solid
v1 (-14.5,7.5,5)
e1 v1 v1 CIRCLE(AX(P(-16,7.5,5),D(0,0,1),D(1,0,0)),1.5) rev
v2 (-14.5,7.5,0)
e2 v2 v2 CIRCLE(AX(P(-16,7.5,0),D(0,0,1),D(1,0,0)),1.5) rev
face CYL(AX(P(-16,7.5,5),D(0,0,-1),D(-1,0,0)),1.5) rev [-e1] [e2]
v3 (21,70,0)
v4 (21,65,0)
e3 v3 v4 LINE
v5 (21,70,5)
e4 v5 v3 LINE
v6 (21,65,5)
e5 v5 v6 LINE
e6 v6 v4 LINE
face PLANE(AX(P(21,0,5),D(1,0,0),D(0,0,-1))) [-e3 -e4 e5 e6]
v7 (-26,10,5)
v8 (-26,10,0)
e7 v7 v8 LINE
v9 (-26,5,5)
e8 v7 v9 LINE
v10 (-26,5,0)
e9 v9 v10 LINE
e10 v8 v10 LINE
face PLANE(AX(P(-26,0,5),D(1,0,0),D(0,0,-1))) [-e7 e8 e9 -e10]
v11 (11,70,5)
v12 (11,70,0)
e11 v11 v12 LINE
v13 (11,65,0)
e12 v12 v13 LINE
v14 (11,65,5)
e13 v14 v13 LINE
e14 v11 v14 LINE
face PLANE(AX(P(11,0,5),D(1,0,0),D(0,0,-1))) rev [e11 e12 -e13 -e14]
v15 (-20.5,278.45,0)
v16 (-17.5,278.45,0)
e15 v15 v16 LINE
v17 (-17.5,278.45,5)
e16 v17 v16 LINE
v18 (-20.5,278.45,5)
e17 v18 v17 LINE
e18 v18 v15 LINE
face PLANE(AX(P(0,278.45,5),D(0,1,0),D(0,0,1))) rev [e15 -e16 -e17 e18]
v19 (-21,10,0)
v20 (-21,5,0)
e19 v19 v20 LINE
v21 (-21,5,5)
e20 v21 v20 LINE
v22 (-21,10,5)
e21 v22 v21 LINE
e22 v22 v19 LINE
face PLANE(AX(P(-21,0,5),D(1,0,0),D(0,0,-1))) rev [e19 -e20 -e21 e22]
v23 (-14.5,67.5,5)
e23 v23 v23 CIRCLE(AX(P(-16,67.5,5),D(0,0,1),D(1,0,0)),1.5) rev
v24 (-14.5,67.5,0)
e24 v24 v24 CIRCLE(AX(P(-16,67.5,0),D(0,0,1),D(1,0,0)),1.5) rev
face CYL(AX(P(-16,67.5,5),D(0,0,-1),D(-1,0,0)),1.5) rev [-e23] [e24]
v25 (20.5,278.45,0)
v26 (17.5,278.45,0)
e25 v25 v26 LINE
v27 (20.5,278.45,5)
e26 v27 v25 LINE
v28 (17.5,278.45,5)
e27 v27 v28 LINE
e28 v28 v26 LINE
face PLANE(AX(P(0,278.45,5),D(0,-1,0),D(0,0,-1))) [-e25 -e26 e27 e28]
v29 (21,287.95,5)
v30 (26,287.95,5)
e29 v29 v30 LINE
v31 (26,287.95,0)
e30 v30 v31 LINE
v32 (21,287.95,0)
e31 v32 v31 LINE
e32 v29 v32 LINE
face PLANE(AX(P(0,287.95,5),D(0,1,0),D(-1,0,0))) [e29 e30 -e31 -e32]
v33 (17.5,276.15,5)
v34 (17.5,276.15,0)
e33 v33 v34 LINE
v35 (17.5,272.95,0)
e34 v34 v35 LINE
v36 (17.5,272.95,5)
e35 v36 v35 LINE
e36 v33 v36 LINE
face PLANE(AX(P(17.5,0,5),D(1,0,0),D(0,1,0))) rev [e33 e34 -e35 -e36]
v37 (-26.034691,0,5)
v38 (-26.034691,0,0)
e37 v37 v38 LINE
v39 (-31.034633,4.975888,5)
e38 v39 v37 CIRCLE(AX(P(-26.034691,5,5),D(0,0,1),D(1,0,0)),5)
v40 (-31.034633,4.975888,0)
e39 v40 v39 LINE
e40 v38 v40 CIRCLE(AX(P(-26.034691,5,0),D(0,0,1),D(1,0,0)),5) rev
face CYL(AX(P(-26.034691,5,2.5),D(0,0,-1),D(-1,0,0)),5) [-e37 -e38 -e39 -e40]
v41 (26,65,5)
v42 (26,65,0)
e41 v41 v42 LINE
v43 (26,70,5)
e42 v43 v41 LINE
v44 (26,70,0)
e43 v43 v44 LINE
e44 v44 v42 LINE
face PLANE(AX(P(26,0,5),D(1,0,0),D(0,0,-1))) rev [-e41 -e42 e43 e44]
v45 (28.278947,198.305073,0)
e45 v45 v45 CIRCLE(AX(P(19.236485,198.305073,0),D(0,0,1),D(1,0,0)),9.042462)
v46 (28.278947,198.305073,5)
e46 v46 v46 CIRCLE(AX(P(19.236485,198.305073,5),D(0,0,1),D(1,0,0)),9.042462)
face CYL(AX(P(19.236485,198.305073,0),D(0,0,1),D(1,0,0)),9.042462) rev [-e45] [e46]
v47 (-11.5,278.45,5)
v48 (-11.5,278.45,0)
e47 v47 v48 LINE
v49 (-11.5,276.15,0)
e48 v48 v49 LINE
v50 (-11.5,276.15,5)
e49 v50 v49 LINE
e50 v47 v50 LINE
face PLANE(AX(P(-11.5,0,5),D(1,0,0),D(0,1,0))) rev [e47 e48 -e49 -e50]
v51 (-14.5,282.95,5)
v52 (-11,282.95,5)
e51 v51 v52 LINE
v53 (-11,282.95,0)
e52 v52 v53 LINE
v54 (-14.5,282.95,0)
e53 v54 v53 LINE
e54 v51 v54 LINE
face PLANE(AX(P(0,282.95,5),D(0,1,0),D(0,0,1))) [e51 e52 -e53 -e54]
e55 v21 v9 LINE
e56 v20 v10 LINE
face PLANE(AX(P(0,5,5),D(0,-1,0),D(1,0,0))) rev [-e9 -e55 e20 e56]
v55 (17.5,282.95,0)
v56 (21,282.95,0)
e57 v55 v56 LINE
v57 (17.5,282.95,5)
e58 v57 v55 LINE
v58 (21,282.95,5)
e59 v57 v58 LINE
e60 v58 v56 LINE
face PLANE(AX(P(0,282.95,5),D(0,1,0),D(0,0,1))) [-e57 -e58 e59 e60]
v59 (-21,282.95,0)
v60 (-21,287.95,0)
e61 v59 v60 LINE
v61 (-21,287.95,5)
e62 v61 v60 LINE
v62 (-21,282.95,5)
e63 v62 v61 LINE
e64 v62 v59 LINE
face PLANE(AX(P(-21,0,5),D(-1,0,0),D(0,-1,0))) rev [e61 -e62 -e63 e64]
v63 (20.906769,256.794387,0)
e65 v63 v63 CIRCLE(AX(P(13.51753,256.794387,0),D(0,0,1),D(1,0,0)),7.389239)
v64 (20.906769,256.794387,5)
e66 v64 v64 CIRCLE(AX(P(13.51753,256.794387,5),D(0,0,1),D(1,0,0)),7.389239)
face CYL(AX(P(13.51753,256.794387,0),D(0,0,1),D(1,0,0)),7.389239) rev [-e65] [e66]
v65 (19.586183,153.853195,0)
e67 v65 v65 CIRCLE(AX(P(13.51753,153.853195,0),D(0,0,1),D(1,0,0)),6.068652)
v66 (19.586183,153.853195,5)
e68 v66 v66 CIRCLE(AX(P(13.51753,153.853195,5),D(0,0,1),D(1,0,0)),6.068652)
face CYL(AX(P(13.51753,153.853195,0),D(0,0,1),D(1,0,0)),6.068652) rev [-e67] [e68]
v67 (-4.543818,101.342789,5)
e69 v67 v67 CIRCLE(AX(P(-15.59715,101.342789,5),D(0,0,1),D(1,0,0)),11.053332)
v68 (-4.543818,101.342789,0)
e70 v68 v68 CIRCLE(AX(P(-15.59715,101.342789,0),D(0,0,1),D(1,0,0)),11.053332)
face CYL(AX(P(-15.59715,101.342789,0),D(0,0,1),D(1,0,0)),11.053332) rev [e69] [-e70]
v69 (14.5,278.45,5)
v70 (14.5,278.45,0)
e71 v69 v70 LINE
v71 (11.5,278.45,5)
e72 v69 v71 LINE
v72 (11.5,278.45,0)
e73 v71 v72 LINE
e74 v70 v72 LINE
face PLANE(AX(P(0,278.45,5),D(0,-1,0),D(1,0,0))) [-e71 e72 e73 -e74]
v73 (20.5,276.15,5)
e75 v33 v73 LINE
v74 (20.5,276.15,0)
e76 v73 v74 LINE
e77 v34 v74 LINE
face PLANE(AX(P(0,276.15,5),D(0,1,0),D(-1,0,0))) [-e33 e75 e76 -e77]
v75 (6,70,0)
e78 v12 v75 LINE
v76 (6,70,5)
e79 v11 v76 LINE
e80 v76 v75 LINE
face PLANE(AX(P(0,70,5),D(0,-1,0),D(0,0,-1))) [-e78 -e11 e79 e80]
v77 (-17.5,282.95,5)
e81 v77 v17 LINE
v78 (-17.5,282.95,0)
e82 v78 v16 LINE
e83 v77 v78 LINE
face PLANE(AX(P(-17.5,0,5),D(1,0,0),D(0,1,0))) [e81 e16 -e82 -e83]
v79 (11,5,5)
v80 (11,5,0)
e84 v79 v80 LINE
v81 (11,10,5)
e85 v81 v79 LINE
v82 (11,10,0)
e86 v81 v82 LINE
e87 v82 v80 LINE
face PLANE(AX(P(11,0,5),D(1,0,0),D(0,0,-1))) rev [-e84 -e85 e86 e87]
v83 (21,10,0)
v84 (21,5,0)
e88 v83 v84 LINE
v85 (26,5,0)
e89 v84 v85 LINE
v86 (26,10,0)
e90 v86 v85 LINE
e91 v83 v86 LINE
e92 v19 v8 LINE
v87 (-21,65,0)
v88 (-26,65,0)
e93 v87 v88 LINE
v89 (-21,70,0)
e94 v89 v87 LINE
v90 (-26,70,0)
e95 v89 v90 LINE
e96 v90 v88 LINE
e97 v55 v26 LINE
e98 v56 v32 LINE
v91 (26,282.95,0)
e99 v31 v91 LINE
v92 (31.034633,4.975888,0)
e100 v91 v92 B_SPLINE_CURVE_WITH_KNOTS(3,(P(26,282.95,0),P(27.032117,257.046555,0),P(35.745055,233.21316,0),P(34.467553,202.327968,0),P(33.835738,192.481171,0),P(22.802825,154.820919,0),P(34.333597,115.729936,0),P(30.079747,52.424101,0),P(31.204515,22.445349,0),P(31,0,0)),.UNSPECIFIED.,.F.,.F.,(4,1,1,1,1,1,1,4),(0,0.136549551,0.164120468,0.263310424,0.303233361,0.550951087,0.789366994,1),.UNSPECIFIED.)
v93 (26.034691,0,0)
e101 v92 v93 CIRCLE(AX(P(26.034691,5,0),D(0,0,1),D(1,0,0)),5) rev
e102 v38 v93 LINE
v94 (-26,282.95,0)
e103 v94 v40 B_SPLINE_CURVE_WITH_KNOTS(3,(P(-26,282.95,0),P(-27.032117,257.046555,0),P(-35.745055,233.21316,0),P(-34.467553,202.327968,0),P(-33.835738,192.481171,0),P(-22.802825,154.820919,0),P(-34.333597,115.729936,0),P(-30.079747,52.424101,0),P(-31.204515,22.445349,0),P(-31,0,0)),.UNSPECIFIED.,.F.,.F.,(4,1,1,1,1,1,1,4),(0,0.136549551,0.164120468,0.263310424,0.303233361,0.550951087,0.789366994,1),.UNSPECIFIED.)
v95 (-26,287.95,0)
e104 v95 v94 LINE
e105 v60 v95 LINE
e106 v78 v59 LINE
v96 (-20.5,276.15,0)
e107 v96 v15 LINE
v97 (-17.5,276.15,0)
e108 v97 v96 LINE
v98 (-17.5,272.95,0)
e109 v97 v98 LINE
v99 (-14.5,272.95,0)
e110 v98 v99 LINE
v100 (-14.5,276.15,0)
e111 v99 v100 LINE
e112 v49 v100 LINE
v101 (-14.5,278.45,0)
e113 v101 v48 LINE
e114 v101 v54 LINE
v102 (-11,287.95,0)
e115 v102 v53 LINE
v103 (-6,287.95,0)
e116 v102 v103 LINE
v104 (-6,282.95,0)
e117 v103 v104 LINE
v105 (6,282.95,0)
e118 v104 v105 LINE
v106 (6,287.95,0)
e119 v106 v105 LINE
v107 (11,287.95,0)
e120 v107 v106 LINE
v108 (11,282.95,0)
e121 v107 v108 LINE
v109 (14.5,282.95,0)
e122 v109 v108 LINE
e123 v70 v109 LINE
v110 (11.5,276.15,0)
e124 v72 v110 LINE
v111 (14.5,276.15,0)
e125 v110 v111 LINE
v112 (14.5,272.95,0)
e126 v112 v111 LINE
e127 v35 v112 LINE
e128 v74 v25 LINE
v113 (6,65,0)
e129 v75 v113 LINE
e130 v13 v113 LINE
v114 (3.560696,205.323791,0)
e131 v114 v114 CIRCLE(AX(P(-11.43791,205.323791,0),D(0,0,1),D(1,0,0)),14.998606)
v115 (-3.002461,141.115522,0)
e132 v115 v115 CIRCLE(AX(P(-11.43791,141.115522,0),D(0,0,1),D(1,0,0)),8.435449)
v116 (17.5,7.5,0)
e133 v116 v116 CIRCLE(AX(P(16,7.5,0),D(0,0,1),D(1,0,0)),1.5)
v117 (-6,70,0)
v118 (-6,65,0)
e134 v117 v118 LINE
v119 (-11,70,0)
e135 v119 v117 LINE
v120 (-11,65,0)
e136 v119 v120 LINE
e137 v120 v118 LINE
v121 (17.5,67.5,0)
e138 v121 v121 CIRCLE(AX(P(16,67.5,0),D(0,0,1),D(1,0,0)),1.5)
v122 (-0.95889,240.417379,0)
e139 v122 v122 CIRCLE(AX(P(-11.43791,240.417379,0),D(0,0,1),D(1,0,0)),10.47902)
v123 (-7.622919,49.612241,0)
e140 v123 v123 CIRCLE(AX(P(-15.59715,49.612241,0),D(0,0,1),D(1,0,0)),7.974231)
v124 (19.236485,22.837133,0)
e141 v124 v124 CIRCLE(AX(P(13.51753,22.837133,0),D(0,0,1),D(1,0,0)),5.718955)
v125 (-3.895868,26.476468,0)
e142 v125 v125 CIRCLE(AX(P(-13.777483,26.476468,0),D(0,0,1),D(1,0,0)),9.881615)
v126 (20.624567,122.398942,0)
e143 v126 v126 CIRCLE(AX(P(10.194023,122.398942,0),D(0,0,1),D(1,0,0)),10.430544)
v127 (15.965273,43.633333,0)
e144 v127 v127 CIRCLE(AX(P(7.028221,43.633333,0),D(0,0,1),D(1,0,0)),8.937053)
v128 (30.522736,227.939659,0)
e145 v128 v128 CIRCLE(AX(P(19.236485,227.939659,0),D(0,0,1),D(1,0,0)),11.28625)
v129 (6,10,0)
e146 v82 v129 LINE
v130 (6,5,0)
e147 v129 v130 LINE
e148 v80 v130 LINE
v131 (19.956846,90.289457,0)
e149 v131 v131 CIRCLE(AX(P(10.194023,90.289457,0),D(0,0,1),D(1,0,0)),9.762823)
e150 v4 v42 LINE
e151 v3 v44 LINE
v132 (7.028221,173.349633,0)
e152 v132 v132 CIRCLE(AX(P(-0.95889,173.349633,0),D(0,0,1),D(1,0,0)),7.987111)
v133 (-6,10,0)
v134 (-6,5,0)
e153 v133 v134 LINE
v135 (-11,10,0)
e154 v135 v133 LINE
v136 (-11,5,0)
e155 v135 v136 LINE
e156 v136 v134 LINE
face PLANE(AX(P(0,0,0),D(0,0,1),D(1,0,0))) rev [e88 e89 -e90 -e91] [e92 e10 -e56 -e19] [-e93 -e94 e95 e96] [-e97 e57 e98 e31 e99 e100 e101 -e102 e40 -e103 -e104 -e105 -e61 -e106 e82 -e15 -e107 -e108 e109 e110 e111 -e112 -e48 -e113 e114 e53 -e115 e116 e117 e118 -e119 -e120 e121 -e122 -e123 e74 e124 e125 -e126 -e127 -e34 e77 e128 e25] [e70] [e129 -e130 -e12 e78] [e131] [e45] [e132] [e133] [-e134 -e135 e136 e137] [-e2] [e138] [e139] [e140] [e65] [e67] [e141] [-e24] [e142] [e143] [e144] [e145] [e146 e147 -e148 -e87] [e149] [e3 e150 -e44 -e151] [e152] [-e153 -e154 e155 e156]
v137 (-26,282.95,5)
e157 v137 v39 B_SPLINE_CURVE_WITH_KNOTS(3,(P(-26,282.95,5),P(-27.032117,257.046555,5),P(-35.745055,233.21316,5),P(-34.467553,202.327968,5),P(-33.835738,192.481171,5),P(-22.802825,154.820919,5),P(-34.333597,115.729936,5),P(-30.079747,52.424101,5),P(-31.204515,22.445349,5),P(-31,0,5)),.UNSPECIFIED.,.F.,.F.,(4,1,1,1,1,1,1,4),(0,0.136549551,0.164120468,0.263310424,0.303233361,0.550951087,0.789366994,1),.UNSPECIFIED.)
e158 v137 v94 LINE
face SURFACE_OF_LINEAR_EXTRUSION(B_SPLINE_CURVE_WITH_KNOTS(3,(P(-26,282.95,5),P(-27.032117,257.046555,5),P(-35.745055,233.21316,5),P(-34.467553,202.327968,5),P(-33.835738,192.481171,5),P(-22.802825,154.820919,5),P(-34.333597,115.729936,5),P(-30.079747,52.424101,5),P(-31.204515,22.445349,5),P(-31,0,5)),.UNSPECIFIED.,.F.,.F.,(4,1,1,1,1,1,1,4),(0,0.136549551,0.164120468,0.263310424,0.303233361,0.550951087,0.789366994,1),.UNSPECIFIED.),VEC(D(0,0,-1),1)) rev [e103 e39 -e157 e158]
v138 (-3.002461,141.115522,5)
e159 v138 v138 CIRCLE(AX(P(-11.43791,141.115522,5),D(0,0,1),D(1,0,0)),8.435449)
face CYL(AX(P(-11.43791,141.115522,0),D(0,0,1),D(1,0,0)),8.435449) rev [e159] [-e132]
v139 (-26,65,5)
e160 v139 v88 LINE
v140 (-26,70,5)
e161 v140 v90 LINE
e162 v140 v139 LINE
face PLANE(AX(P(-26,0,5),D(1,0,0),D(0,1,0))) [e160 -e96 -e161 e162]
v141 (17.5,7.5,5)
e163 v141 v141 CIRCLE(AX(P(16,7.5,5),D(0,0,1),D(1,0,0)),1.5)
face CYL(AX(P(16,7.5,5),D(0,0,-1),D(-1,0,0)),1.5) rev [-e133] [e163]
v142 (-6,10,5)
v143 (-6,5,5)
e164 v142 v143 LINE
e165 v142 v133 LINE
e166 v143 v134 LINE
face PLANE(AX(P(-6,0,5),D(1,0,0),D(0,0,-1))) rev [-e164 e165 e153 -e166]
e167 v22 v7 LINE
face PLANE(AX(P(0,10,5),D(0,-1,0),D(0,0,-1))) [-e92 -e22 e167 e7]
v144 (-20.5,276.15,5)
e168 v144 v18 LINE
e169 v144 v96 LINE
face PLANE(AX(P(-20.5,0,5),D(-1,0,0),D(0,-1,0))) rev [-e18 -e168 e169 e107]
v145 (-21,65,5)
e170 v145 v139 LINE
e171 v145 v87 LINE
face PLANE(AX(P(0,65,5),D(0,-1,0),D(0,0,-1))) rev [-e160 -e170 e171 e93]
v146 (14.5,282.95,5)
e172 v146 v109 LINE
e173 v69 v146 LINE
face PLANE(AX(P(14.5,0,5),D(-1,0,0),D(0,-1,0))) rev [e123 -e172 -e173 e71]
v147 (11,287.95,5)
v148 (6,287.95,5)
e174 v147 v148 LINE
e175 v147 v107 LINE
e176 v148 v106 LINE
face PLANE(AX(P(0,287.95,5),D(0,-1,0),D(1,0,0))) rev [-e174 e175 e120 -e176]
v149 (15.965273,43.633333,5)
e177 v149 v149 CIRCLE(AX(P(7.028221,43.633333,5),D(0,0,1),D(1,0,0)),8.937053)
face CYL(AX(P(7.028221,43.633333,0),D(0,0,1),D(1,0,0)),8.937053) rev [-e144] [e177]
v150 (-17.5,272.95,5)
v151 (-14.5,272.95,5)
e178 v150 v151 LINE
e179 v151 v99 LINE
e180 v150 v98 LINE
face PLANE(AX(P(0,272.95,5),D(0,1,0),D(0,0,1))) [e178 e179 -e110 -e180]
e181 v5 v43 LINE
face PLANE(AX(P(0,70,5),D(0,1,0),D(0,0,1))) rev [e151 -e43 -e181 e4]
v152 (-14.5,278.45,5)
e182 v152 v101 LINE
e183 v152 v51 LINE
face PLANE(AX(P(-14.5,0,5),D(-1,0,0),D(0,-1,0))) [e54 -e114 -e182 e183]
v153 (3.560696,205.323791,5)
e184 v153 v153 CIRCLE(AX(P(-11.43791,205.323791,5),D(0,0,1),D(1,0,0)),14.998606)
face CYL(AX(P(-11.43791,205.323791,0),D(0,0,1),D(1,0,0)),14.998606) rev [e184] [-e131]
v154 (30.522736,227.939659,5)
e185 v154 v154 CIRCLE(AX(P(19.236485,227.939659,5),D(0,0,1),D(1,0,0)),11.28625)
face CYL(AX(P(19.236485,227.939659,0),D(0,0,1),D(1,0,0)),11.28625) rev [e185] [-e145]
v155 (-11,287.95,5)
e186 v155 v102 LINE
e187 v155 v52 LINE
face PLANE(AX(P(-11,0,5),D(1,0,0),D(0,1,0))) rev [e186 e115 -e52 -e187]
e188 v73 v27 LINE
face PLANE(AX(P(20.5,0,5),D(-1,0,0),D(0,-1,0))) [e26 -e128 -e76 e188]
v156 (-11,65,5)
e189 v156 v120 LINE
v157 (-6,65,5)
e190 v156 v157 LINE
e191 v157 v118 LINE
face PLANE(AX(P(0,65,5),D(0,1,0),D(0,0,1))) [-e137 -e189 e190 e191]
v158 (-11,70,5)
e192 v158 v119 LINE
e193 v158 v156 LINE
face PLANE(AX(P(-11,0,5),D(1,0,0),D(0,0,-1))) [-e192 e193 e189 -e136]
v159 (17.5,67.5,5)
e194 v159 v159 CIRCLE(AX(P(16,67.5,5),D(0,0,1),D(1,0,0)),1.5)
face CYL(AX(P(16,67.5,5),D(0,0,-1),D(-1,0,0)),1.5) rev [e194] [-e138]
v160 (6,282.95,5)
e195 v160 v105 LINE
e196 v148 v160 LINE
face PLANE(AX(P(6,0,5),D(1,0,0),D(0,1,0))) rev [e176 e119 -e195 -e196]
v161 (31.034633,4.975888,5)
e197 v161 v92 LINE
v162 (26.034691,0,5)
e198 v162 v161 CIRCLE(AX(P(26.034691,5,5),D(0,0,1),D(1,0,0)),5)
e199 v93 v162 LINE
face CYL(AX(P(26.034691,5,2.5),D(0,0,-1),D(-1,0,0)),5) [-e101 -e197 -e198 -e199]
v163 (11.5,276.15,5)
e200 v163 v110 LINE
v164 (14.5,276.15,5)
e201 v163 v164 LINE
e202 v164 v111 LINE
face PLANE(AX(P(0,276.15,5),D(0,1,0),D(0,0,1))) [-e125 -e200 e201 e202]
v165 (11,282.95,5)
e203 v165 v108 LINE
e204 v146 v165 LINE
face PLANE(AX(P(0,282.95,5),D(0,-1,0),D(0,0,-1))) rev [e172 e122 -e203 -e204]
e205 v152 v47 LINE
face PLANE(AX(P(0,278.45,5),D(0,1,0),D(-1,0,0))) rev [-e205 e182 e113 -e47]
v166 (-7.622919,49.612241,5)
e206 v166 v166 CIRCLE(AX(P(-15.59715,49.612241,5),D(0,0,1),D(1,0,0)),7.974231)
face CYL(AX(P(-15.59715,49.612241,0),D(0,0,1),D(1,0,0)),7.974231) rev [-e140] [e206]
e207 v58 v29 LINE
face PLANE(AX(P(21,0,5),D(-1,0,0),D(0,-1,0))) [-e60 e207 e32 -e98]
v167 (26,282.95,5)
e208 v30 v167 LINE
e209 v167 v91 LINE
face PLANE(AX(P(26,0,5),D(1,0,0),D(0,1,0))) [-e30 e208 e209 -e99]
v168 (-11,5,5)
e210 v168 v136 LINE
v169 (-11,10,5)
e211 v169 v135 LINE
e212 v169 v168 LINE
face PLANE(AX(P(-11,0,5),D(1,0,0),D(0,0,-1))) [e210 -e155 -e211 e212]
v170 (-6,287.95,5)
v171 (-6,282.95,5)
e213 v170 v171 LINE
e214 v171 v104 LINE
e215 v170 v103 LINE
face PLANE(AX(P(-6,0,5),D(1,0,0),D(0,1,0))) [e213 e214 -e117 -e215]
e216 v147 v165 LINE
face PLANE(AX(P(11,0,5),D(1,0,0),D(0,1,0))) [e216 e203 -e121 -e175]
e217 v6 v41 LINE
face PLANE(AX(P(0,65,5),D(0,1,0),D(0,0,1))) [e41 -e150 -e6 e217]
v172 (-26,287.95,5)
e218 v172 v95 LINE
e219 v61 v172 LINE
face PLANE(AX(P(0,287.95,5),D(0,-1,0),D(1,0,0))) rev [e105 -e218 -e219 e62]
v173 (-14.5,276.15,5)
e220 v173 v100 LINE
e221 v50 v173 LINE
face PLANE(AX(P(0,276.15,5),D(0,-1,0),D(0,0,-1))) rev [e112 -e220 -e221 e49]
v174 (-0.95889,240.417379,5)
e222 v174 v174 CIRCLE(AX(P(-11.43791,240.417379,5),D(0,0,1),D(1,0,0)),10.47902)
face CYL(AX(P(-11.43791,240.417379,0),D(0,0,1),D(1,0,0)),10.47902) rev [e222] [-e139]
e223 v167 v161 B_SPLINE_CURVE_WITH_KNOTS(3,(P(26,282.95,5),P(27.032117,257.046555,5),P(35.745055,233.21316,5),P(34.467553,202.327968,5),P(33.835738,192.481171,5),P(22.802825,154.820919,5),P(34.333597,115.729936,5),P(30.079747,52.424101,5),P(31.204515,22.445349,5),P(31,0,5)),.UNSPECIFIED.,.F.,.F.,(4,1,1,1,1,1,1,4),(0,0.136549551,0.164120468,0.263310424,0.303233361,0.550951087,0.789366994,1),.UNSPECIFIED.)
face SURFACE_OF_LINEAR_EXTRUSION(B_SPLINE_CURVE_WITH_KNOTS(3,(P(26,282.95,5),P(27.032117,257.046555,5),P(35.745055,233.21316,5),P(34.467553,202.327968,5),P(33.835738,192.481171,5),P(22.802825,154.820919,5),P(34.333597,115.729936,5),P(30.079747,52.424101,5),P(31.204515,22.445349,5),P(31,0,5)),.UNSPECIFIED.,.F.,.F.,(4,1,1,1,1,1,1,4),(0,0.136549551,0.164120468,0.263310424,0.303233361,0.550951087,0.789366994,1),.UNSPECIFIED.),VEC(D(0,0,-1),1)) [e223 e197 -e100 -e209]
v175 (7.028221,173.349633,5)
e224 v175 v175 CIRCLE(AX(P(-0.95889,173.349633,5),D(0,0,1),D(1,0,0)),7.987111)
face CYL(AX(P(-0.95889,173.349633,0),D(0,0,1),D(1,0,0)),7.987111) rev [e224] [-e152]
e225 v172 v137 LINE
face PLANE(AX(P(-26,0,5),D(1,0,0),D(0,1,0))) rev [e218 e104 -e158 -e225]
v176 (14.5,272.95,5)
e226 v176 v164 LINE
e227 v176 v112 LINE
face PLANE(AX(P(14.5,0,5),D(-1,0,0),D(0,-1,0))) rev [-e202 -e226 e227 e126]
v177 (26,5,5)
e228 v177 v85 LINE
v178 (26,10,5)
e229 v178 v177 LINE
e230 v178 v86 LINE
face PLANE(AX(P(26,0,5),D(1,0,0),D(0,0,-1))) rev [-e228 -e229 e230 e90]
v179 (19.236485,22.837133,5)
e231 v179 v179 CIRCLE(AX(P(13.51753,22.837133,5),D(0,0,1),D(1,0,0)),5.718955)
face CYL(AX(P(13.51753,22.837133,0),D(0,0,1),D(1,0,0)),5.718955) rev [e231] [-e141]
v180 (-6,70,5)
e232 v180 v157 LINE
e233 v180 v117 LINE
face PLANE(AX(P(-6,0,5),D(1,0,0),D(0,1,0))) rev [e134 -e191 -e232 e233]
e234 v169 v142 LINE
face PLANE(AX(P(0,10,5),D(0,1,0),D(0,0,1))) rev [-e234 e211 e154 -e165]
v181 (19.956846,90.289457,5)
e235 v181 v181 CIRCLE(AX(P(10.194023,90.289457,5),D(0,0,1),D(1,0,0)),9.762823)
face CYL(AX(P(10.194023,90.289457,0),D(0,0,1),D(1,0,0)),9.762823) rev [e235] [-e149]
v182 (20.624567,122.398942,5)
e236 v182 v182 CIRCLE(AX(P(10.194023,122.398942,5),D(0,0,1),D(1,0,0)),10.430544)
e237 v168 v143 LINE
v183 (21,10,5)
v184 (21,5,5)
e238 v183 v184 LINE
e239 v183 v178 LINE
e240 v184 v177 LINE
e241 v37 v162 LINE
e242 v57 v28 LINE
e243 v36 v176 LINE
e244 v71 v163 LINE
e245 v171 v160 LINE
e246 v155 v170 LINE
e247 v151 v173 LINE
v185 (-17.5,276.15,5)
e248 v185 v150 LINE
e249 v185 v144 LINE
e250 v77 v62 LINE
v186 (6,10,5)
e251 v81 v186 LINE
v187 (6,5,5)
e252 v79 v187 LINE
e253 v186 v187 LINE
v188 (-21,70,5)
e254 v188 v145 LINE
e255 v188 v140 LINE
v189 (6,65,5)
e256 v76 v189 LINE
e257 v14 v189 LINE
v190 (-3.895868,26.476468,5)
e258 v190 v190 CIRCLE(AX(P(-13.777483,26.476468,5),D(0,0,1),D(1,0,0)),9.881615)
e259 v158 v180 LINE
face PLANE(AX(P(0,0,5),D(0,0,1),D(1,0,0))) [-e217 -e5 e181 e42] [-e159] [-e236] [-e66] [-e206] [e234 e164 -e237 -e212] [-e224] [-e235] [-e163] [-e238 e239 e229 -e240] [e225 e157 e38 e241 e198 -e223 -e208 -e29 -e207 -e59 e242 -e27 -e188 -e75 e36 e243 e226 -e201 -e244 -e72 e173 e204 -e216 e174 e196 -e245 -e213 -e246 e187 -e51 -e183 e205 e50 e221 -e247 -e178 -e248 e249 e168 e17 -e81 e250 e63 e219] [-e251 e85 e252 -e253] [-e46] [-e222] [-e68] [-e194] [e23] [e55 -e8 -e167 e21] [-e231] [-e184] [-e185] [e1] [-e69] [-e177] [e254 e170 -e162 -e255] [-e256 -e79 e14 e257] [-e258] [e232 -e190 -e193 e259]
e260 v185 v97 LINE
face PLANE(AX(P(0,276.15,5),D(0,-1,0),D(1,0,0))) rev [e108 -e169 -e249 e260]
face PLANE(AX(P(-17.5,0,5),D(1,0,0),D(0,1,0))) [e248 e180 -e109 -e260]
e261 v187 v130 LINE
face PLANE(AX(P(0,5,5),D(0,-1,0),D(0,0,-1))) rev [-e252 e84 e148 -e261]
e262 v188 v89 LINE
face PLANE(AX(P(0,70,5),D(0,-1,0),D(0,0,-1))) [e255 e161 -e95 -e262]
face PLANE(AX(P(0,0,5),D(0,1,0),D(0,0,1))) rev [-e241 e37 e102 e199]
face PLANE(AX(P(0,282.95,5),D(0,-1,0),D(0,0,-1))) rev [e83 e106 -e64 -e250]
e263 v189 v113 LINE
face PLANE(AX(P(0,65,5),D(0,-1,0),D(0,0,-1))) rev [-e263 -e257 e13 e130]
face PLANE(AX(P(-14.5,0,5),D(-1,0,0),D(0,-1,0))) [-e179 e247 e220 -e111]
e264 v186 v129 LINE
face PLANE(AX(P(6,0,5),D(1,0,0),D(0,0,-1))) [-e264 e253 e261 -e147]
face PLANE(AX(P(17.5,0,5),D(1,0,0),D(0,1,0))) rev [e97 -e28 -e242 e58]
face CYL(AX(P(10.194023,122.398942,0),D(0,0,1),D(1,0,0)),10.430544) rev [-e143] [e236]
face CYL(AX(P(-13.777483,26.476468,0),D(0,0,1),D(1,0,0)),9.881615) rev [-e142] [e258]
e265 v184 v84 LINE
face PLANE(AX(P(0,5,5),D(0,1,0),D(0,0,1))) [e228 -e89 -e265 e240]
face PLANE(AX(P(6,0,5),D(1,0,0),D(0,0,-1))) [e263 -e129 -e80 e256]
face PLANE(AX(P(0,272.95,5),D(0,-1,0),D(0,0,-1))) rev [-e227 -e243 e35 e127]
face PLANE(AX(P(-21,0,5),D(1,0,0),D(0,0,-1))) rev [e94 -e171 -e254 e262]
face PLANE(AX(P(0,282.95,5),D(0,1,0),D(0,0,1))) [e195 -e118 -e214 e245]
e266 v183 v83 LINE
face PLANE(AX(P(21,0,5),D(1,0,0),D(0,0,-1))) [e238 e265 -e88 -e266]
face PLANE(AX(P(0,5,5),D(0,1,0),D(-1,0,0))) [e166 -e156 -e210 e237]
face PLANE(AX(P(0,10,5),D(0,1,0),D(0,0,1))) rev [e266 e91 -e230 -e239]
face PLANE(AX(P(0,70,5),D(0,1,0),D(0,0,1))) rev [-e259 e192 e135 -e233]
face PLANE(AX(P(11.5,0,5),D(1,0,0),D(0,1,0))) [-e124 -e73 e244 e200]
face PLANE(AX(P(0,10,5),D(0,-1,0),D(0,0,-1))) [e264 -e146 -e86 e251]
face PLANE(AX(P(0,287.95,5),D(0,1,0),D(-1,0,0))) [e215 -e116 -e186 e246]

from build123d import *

# Parameters (mm, degrees)
BOSS_EXTRU_1_OUTLINE_W  = 5
BOSS_EXTRU_1_OUTLINE_H  = 5
BOSS_EXTRU_1_OUTLINE_R  = 1.5
BOSS_EXTRU_1_DEPTH      = 5
CONG_1_R                = 5
ESQUISSE2_R             = 10.479020463
ESQUISSE2_R_2           = 11.286250442
ESQUISSE2_R_3           = 14.998606228
ESQUISSE2_R_4           = 9.04246197
ESQUISSE2_R_5           = 7.987110618
ESQUISSE2_R_6           = 8.435448753
ESQUISSE2_R_7           = 10.430543624
ESQUISSE2_R_8           = 11.053332103
ESQUISSE2_R_9           = 9.762822846
ESQUISSE2_R_10          = 7.974231095
ESQUISSE2_R_11          = 8.937052564
ESQUISSE2_R_12          = 9.881615002
ESQUISSE2_R_13          = 5.718955096
ESQUISSE2_R_14          = 6.068652319
ESQUISSE2_R_15          = 7.38923853
ENL_V_MAT_EXTRU_1_DEPTH = 291.112887432


# Read off the part's stored shape, not the designer's step: Boss.-Extru.1
with BuildPart() as part:
    # Boss.-Extru.1 outline → Boss.-Extru.1 (new body)
    with BuildSketch(Plane.XY):
        with BuildLine():
            Line((-11, 282.95), (-14.5, 282.95))
            Line((-14.5, 282.95), (-14.5, 278.45))
            Line((-14.5, 278.45), (-11.5, 278.45))
            Line((-11.5, 278.45), (-11.5, 276.15))
            Line((-11.5, 276.15), (-14.5, 276.15))
            Line((-14.5, 276.15), (-14.5, 272.95))
            Line((-14.5, 272.95), (-17.5, 272.95))
            Line((-17.5, 272.95), (-17.5, 276.15))
            Line((-17.5, 276.15), (-20.5, 276.15))
            Line((-20.5, 276.15), (-20.5, 278.45))
            Line((-20.5, 278.45), (-17.5, 278.45))
            Line((-17.5, 278.45), (-17.5, 282.95))
            Line((-17.5, 282.95), (-21, 282.95))
            Line((-21, 282.95), (-21, 287.95))
            Line((-21, 287.95), (-26, 287.95))
            Line((-26, 287.95), (-26, 282.95))
            add(Edge.make_bspline(
                [(-26, 282.95), (-27.032116552, 257.046555191), (-35.745054738, 233.213160009), (-34.467552531, 202.327968058), (-33.835737582, 192.481171289), (-22.802824593, 154.820919245), (-34.333596657, 115.729935588), (-30.079746619, 52.424101474), (-31.204515071, 22.445349412), (-31, 0)],
                knots=[0, 0, 0, 0, 0.136549551, 0.164120468, 0.263310424, 0.303233361, 0.550951087, 0.789366994, 1, 1, 1, 1], degree=3))
            Line((-31, 0), (31, 0))
            add(Edge.make_bspline(
                [(26, 282.95), (27.032116552, 257.046555191), (35.745054738, 233.213160009), (34.467552531, 202.327968058), (33.835737582, 192.481171289), (22.802824593, 154.820919245), (34.333596657, 115.729935588), (30.079746619, 52.424101474), (31.204515071, 22.445349412), (31, 0)],
                knots=[0, 0, 0, 0, 0.136549551, 0.164120468, 0.263310424, 0.303233361, 0.550951087, 0.789366994, 1, 1, 1, 1], degree=3))
            Line((26, 282.95), (26, 287.95))
            Line((26, 287.95), (21, 287.95))
            Line((21, 287.95), (21, 282.95))
            Line((21, 282.95), (17.5, 282.95))
            Line((17.5, 282.95), (17.5, 278.45))
            Line((17.5, 278.45), (20.5, 278.45))
            Line((20.5, 278.45), (20.5, 276.15))
            Line((20.5, 276.15), (17.5, 276.15))
            Line((17.5, 276.15), (17.5, 272.95))
            Line((17.5, 272.95), (14.5, 272.95))
            Line((14.5, 272.95), (14.5, 276.15))
            Line((14.5, 276.15), (11.5, 276.15))
            Line((11.5, 276.15), (11.5, 278.45))
            Line((11.5, 278.45), (14.5, 278.45))
            Line((14.5, 278.45), (14.5, 282.95))
            Line((14.5, 282.95), (11, 282.95))
            Line((11, 282.95), (11, 287.95))
            Line((11, 287.95), (6, 287.95))
            Line((6, 287.95), (6, 282.95))
            Line((6, 282.95), (-6, 282.95))
            Line((-6, 282.95), (-6, 287.95))
            Line((-6, 287.95), (-11, 287.95))
            Line((-11, 287.95), (-11, 282.95))
        make_face()
        with Locations((-23.5, 7.5)):
            Rectangle(BOSS_EXTRU_1_OUTLINE_W, BOSS_EXTRU_1_OUTLINE_H, mode=Mode.SUBTRACT)
        with Locations((-23.5, 67.5)):
            Rectangle(BOSS_EXTRU_1_OUTLINE_W, BOSS_EXTRU_1_OUTLINE_H, mode=Mode.SUBTRACT)
        with Locations((-16, 7.5)):
            Circle(BOSS_EXTRU_1_OUTLINE_R, mode=Mode.SUBTRACT)
        with Locations((-8.5, 7.5)):
            Rectangle(BOSS_EXTRU_1_OUTLINE_W, BOSS_EXTRU_1_OUTLINE_H, mode=Mode.SUBTRACT)
        with Locations((-16, 67.5)):
            Circle(BOSS_EXTRU_1_OUTLINE_R, mode=Mode.SUBTRACT)
        with Locations((-8.5, 67.5)):
            Rectangle(BOSS_EXTRU_1_OUTLINE_W, BOSS_EXTRU_1_OUTLINE_H, mode=Mode.SUBTRACT)
        with Locations((8.5, 7.5)):
            Rectangle(BOSS_EXTRU_1_OUTLINE_W, BOSS_EXTRU_1_OUTLINE_H, mode=Mode.SUBTRACT)
        with Locations((16, 7.5)):
            Circle(BOSS_EXTRU_1_OUTLINE_R, mode=Mode.SUBTRACT)
        with Locations((8.5, 67.5)):
            Rectangle(BOSS_EXTRU_1_OUTLINE_W, BOSS_EXTRU_1_OUTLINE_H, mode=Mode.SUBTRACT)
        with Locations((16, 67.5)):
            Circle(BOSS_EXTRU_1_OUTLINE_R, mode=Mode.SUBTRACT)
        with Locations((23.5, 7.5)):
            Rectangle(BOSS_EXTRU_1_OUTLINE_W, BOSS_EXTRU_1_OUTLINE_H, mode=Mode.SUBTRACT)
        with Locations((23.5, 67.5)):
            Rectangle(BOSS_EXTRU_1_OUTLINE_W, BOSS_EXTRU_1_OUTLINE_H, mode=Mode.SUBTRACT)
    extrude(amount=BOSS_EXTRU_1_DEPTH)

    # Congé1
    cong_1_edges = [part.edges().sort_by_distance(p)[0] for p in [
        (31, 0, 2.5),
        (-31, 0, 2.5),
    ]]
    fillet(cong_1_edges, radius=CONG_1_R)

    # Esquisse2 → Enlèv. mat.-Extru.1 (cut, through all)
    with BuildSketch(Plane.XY.offset(5)):
        with Locations((-11.437910192, 240.417379121)):
            Circle(ESQUISSE2_R)
        with Locations((19.236485323, 227.939658911)):
            Circle(ESQUISSE2_R_2)
        with Locations((-11.437910192, 205.323791031)):
            Circle(ESQUISSE2_R_3)
        with Locations((19.236485323, 198.305073413)):
            Circle(ESQUISSE2_R_4)
        with Locations((-0.95888973, 173.349632994)):
            Circle(ESQUISSE2_R_5)
        with Locations((-11.437910192, 141.115522452)):
            Circle(ESQUISSE2_R_6)
        with Locations((10.194023353, 122.398942137)):
            Circle(ESQUISSE2_R_7)
        with Locations((-15.597150262, 101.342789283)):
            Circle(ESQUISSE2_R_8)
        with Locations((10.194023353, 90.28945718)):
            Circle(ESQUISSE2_R_9)
        with Locations((-15.597150262, 49.612240914)):
            Circle(ESQUISSE2_R_10)
        with Locations((7.028220888, 43.633333313)):
            Circle(ESQUISSE2_R_11)
        with Locations((-13.777482732, 26.476468025)):
            Circle(ESQUISSE2_R_12)
        with Locations((13.517530227, 22.837132964)):
            Circle(ESQUISSE2_R_13)
        with Locations((13.517530227, 153.853195166)):
            Circle(ESQUISSE2_R_14)
        with Locations((13.517530227, 256.794386897)):
            Circle(ESQUISSE2_R_15)
    extrude(amount=-ENL_V_MAT_EXTRU_1_DEPTH, mode=Mode.SUBTRACT)


solid = part.part
